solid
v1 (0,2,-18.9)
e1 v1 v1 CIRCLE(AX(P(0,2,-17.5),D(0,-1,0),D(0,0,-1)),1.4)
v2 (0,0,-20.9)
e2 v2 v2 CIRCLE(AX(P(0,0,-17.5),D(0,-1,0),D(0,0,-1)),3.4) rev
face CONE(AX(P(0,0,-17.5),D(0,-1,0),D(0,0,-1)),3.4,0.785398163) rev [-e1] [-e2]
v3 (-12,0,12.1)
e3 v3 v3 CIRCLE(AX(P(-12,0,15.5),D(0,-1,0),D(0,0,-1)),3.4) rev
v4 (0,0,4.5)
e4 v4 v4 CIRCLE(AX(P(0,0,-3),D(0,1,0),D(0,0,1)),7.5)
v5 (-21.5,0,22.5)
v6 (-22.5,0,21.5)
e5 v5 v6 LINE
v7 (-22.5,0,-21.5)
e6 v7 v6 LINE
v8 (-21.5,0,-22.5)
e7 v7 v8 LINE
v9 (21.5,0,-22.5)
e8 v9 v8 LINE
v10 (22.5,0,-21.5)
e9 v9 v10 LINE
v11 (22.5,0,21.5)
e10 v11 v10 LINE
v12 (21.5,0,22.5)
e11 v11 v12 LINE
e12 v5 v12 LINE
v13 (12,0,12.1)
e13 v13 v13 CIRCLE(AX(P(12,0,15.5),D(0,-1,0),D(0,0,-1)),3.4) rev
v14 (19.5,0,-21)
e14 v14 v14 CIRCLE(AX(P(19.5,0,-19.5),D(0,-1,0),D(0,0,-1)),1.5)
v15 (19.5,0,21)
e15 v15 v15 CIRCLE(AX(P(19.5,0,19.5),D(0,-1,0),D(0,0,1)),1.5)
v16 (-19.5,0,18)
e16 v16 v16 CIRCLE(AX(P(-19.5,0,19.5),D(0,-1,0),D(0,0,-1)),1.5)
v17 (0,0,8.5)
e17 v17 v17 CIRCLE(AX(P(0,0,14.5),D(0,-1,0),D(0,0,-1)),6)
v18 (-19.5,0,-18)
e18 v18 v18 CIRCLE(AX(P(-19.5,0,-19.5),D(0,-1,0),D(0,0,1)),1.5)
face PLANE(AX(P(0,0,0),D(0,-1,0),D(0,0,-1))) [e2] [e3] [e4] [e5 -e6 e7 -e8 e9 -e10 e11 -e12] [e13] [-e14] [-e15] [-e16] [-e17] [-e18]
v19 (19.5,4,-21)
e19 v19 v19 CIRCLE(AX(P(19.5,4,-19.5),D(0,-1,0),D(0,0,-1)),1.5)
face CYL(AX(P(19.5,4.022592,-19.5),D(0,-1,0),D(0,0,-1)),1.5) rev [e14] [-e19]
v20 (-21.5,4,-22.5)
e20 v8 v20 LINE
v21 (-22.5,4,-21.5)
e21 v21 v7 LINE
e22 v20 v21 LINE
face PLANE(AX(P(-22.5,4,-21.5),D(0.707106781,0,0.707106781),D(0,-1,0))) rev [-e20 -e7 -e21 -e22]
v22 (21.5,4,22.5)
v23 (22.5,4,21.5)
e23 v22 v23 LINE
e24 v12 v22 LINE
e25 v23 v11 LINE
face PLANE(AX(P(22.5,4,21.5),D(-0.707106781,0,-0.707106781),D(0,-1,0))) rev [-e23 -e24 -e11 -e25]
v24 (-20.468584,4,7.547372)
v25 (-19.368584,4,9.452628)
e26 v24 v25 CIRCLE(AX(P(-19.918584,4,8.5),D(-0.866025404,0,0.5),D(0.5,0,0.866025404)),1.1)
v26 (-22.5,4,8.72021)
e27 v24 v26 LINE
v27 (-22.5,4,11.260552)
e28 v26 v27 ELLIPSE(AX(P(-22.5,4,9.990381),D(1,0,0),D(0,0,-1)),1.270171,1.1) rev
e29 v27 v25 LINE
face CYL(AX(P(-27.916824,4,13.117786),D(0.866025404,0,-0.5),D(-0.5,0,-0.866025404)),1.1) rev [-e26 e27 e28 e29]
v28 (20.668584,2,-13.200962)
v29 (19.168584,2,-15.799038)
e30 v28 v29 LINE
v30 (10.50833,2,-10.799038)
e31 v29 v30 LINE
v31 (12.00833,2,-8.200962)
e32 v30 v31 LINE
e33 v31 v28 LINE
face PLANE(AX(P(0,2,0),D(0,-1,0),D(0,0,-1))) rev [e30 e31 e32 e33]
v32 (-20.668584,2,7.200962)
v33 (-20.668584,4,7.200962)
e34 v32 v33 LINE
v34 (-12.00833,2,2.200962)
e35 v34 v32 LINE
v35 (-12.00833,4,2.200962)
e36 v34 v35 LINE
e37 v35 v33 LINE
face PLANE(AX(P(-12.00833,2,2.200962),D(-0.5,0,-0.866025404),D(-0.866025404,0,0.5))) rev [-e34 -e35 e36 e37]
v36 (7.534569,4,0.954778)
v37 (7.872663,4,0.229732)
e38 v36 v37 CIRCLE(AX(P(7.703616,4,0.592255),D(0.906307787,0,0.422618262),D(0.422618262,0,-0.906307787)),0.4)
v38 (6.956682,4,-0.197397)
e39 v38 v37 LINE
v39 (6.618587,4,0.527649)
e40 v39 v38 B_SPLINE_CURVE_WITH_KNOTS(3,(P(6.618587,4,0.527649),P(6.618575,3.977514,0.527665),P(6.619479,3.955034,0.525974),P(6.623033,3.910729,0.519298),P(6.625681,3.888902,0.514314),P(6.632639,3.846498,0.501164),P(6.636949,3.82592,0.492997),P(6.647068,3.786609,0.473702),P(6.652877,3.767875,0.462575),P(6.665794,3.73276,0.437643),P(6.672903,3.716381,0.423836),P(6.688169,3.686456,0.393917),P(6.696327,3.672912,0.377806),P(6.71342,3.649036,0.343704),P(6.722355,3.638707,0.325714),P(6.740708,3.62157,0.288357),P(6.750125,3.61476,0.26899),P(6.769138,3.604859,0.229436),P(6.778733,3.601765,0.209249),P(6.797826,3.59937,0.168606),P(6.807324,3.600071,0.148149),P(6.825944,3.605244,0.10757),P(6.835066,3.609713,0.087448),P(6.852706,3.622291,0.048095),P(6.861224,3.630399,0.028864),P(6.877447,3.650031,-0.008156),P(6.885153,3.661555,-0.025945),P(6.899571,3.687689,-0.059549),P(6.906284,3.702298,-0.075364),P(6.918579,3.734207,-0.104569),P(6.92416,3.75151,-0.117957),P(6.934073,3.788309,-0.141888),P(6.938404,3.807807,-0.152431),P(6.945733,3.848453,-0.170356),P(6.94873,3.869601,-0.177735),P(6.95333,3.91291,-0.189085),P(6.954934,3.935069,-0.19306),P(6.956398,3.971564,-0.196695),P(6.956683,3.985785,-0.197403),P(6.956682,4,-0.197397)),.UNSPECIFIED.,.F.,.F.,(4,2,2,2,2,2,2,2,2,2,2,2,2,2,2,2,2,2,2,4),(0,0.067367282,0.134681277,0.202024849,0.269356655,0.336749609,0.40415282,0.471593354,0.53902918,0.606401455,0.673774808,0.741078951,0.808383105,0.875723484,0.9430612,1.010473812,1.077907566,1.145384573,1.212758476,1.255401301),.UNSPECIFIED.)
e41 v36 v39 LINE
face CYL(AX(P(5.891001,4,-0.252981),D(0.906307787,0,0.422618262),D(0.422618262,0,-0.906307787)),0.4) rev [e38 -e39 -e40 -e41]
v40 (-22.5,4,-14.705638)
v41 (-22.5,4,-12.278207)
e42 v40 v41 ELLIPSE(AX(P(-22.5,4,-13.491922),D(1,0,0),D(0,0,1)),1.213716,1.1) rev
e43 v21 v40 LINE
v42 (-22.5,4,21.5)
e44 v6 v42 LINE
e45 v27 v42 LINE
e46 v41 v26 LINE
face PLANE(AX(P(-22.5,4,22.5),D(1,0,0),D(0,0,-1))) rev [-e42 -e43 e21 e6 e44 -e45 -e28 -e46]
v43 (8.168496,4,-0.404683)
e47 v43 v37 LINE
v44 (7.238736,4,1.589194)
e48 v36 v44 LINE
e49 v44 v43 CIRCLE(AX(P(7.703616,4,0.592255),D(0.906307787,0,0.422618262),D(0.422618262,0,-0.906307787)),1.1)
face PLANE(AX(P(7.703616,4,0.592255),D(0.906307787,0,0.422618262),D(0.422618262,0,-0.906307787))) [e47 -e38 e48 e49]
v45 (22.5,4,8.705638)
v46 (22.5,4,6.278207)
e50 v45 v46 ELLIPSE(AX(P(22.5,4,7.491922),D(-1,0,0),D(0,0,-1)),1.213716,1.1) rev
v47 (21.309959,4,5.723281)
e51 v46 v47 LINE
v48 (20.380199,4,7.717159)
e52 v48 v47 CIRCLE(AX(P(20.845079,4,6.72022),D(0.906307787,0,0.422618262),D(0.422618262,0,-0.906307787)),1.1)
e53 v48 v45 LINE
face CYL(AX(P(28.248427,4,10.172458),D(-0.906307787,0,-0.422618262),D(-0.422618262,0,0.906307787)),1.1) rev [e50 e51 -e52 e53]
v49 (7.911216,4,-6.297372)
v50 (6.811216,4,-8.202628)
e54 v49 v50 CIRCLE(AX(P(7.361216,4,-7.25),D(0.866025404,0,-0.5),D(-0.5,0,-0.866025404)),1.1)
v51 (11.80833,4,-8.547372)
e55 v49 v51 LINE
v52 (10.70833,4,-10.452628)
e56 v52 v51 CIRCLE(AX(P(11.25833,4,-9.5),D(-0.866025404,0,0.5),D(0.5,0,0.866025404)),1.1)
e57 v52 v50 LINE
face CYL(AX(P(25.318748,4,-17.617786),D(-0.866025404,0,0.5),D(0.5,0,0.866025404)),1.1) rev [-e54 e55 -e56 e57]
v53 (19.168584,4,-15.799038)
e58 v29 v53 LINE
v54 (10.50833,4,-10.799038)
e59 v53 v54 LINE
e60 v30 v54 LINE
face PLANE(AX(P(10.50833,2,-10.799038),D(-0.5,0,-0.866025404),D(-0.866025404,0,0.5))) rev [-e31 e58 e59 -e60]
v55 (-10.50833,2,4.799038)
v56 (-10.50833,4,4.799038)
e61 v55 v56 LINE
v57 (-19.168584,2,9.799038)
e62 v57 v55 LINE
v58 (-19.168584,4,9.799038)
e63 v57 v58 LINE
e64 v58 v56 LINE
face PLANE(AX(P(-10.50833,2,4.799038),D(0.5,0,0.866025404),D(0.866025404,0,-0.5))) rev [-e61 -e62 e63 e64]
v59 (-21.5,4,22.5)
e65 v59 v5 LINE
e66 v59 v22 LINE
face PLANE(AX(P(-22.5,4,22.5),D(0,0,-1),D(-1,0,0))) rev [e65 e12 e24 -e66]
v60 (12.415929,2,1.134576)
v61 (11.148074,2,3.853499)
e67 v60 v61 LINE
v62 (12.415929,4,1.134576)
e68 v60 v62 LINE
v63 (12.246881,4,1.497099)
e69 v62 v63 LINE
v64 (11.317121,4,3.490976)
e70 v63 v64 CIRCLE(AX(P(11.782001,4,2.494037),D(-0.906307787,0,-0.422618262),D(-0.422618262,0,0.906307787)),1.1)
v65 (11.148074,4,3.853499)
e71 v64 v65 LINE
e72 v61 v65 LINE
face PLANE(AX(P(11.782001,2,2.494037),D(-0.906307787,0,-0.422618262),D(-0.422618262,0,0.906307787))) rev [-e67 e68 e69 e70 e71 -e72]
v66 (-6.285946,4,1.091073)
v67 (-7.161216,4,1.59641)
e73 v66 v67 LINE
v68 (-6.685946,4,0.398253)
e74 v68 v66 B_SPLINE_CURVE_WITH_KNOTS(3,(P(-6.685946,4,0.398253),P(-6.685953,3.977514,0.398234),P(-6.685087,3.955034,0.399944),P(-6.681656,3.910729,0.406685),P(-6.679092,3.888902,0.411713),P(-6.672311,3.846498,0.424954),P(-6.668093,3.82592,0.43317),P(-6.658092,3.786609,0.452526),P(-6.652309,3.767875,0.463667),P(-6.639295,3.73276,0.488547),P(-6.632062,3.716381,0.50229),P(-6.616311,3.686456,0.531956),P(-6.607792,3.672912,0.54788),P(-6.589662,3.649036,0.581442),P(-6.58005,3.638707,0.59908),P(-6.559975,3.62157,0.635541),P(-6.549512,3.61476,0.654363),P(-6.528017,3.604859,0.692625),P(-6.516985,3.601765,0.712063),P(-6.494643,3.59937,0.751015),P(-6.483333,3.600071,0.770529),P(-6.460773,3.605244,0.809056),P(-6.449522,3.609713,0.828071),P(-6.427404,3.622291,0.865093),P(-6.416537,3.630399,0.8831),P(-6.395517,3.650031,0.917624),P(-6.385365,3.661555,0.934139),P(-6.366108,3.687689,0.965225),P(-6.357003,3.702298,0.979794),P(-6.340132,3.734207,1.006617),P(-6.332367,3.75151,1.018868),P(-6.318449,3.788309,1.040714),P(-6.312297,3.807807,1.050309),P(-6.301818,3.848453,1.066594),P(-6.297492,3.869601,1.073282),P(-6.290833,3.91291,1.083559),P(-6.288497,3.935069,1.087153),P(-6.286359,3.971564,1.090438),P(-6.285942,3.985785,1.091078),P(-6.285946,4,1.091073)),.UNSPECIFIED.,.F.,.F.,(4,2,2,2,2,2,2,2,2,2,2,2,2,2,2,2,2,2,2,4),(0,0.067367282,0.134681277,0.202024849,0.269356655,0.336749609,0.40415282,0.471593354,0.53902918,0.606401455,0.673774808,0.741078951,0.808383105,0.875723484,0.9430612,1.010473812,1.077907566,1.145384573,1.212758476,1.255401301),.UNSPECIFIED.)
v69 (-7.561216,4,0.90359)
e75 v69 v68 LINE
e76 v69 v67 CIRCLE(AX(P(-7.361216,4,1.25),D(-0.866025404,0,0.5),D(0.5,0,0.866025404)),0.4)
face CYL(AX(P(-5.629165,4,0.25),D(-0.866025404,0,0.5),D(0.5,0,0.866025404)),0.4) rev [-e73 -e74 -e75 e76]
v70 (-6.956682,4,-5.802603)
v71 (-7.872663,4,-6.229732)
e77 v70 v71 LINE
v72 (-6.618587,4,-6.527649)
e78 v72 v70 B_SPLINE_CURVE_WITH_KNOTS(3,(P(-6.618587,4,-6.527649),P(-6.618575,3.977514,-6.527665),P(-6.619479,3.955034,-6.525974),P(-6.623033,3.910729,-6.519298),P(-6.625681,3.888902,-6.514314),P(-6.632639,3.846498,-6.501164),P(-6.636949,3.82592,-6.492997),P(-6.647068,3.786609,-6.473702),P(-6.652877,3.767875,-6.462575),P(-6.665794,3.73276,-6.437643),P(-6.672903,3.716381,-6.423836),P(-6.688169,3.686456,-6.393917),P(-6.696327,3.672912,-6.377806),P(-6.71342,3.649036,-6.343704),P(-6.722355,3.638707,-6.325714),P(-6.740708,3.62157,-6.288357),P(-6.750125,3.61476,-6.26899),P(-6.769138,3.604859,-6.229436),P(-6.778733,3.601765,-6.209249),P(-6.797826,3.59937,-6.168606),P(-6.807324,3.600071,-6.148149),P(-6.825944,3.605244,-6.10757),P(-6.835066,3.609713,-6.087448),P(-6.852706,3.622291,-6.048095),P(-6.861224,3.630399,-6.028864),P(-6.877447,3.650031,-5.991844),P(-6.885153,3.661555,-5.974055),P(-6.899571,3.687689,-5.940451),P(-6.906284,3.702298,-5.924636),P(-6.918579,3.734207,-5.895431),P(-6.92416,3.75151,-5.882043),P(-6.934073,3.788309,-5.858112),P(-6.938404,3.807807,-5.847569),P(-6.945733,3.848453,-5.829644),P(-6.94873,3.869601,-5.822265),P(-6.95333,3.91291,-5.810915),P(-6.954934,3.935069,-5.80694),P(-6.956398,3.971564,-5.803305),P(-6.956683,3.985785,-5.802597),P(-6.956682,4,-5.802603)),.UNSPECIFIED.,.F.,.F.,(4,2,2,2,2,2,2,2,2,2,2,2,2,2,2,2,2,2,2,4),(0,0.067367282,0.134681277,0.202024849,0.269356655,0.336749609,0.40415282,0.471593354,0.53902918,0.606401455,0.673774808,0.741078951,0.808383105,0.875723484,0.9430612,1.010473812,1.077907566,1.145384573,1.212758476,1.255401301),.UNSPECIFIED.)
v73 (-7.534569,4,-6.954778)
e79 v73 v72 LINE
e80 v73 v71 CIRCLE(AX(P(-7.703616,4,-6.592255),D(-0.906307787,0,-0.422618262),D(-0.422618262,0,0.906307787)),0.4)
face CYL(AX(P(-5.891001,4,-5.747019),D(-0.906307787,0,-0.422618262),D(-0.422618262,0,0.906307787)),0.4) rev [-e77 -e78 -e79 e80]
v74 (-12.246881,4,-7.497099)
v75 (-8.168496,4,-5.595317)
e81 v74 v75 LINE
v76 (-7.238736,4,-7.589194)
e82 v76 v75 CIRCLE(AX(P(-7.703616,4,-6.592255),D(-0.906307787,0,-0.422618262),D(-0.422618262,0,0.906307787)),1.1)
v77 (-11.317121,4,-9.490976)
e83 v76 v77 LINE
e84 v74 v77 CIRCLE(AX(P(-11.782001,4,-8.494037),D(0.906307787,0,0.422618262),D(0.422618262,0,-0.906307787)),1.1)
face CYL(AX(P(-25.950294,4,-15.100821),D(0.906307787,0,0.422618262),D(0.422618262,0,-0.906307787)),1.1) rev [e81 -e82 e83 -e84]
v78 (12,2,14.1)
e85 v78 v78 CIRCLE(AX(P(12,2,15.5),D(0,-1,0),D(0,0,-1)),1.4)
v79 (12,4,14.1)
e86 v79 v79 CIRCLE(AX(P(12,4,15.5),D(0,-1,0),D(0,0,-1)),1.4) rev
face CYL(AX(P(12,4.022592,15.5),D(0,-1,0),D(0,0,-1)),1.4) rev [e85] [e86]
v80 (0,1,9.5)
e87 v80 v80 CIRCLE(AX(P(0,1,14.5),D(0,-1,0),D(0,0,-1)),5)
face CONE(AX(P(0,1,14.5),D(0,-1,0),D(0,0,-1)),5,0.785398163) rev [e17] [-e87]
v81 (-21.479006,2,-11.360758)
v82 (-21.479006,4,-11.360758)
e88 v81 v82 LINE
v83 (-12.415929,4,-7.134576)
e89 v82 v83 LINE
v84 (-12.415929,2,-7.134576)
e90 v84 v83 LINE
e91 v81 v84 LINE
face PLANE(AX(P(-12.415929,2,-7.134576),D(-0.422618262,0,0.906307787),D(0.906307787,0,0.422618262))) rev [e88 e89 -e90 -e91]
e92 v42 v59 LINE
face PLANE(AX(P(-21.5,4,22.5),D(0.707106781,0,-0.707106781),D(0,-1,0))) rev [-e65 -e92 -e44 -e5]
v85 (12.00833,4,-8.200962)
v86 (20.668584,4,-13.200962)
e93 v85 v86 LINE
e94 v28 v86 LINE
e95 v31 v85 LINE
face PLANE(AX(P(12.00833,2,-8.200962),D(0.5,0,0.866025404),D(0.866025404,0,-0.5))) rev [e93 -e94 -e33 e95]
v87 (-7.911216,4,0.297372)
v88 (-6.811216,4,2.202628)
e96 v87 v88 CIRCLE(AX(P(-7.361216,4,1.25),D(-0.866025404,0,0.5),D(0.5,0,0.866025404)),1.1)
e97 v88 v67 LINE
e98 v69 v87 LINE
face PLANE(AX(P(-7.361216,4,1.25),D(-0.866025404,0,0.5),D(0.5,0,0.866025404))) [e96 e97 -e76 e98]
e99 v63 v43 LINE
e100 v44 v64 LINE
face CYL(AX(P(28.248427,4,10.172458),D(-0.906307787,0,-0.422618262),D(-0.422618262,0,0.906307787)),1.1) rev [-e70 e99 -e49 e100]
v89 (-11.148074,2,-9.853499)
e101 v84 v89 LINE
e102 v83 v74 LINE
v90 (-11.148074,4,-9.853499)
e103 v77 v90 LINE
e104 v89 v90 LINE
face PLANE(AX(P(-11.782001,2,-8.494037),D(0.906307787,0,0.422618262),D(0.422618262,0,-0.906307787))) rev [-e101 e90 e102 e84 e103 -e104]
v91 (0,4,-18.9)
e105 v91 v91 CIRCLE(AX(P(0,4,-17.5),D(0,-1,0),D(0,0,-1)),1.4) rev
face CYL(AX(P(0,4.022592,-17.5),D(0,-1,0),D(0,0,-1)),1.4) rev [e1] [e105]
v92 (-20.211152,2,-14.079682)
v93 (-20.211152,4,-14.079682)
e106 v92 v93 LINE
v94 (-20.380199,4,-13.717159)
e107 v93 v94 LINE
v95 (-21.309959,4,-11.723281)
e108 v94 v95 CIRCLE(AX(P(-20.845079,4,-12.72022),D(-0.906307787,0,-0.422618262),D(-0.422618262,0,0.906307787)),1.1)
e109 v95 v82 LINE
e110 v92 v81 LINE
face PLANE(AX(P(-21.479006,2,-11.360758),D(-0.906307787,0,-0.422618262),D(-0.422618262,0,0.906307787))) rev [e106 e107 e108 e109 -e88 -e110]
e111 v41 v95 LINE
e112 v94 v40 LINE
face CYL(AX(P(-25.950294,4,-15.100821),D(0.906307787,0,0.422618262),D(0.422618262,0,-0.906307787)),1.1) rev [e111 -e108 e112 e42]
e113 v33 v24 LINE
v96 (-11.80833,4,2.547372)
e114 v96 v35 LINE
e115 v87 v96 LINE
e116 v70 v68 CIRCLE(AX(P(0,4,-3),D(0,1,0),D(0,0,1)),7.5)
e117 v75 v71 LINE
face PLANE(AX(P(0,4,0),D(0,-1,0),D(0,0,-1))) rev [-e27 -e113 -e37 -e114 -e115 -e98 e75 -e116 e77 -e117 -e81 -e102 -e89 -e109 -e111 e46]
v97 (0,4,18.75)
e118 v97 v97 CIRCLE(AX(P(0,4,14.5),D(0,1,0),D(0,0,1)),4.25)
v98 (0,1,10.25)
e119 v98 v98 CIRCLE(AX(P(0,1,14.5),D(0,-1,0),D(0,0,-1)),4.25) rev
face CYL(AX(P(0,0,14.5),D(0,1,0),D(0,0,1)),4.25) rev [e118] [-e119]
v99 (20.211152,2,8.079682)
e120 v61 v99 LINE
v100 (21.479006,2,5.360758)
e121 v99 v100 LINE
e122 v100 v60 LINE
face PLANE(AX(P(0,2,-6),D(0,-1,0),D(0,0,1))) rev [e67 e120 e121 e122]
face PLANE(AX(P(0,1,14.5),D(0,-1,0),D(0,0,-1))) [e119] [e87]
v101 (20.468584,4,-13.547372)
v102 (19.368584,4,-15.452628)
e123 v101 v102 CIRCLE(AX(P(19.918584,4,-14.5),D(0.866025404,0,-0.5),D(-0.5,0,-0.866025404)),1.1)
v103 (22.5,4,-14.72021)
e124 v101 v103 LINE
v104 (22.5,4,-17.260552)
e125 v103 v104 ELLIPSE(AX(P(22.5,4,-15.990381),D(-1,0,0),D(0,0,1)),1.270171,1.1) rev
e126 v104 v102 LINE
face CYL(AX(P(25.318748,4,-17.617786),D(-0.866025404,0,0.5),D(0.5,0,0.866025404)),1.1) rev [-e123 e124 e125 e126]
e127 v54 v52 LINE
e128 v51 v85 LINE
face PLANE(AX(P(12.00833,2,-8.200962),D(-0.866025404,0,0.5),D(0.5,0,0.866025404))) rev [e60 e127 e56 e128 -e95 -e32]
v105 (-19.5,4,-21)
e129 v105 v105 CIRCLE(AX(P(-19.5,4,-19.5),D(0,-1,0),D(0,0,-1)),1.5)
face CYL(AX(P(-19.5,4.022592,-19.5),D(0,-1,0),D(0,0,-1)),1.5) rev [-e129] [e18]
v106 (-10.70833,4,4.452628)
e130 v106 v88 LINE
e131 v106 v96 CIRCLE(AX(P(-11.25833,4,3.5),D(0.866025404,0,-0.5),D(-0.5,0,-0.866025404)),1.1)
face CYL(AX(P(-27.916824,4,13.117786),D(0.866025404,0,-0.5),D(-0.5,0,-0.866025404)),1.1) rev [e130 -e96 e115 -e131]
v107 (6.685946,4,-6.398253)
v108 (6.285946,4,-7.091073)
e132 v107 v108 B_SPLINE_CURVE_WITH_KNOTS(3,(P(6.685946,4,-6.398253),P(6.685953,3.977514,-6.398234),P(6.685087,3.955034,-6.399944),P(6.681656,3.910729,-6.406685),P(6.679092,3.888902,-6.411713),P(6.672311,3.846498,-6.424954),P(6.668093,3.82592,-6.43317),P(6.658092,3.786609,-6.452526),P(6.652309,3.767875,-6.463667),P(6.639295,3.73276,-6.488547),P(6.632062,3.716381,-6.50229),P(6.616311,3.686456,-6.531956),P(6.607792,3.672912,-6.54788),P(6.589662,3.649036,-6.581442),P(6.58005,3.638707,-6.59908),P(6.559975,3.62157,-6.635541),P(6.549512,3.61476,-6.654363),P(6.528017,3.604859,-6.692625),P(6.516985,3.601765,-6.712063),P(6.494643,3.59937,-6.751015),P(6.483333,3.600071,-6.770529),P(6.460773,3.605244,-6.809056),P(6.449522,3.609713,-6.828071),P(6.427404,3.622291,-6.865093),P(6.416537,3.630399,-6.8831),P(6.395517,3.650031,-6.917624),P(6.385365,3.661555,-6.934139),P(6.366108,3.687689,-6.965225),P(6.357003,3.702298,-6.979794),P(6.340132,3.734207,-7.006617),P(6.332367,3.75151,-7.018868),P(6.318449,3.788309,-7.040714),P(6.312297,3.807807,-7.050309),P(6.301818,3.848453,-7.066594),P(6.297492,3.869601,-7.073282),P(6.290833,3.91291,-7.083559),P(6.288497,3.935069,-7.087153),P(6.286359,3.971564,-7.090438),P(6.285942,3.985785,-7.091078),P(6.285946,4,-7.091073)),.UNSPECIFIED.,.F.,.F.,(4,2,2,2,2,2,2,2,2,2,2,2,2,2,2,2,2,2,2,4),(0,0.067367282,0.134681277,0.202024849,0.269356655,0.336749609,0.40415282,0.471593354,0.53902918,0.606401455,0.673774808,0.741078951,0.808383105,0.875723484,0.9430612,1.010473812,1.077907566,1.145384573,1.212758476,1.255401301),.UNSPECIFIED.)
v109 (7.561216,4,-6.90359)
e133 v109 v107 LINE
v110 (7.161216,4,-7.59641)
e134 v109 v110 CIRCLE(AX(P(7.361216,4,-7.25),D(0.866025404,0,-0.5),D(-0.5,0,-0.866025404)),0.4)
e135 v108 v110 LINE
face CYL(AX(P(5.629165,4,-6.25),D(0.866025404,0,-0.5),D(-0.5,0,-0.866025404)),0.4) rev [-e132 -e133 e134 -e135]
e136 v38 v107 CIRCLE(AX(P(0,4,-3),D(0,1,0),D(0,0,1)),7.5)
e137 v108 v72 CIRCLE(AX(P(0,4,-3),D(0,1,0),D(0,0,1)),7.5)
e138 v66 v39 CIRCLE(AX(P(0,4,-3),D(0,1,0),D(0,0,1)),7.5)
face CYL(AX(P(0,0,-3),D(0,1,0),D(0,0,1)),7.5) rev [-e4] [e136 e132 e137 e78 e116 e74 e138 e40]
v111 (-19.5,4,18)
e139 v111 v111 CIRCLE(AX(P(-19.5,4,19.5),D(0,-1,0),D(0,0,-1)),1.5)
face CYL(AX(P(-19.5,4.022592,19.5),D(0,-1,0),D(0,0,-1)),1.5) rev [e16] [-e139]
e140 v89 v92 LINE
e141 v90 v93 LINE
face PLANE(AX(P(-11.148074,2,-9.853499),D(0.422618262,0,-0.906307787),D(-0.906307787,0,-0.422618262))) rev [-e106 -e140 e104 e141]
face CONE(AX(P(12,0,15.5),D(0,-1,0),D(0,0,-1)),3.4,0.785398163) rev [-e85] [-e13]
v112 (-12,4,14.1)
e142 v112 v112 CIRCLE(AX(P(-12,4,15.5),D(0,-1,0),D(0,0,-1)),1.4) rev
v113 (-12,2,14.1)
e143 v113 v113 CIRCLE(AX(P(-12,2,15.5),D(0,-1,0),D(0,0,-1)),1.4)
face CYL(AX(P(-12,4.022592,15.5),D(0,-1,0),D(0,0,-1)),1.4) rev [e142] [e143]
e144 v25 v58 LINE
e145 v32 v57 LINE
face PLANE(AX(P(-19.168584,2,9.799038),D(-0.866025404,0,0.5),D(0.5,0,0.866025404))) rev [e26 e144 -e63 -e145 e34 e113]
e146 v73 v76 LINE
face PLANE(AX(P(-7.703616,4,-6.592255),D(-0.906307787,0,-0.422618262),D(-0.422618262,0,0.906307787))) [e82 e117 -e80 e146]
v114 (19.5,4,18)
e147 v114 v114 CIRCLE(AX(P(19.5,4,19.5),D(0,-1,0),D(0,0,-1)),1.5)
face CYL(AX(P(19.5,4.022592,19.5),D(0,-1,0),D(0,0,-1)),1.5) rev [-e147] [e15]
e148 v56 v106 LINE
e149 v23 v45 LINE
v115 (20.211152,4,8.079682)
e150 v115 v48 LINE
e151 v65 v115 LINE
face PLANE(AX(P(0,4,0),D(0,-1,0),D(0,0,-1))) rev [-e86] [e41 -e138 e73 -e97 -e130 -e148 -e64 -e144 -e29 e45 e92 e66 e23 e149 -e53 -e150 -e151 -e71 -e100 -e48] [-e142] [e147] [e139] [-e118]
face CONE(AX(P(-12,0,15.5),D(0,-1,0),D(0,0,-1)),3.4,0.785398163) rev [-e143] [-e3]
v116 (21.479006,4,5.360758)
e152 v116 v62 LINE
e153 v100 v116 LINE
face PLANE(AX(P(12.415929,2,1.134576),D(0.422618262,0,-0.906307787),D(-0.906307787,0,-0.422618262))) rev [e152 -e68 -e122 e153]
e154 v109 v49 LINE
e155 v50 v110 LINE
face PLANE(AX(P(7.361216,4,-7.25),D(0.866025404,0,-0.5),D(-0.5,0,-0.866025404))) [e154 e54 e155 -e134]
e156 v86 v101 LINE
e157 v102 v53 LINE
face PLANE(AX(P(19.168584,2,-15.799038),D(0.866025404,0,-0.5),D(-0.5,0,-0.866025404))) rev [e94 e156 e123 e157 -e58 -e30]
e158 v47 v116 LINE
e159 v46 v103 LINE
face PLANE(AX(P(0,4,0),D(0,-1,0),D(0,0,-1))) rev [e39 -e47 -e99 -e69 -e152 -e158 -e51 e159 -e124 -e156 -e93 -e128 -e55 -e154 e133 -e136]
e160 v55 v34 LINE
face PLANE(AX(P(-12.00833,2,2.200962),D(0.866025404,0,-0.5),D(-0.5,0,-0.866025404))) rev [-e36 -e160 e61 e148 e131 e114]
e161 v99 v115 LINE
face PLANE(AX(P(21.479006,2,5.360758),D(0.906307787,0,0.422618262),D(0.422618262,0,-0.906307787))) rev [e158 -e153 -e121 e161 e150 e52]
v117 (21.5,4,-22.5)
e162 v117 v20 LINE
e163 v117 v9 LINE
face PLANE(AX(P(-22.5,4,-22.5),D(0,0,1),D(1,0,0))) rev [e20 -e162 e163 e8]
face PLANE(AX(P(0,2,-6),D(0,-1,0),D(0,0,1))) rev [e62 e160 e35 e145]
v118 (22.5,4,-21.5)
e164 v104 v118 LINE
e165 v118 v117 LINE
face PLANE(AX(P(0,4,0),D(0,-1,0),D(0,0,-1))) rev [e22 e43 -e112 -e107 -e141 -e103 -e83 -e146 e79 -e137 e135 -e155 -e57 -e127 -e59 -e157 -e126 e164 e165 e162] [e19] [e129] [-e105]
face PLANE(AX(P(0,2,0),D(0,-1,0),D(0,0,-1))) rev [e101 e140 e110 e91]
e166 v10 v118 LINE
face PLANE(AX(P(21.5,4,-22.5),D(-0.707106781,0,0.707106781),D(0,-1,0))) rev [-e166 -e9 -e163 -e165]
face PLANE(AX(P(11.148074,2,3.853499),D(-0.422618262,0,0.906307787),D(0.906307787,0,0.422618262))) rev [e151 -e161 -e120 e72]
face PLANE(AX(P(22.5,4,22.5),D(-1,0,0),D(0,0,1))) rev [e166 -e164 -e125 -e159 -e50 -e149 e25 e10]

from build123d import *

# Parameters (mm, degrees)
SKETCH_1_W               = 45
SKETCH_1_H               = 45
EXTRUDE_1_DEPTH          = 4
SKETCH_2_R               = 7.5
CUT_EXTRUDE_1_DEPTH      = 33.070235422
CUT_EXTRUDE_START        = -4.5
SKETCH_4_R               = 1.1
CUT_EXTRUDE_3_DEPTH      = 51.888424881
SKETCH_10_R              = 0.4
CUT_EXTRUDE_9_DEPTH      = 2
SKETCH_7_R               = 1.1
CUT_EXTRUDE_5_DEPTH      = 52.18645266
SKETCH_11_R              = 0.4
CUT_EXTRUDE_10_DEPTH     = 2
CUT_EXTRUDE_4_DEPTH      = 2
PATTERN_CIRCULAR_1_COUNT = 2
SKETCH_6_R               = 1.5
CUT_EXTRUDE_6_DEPTH      = 33.070235434
SKETCH_8_R               = 4.25
CUT_EXTRUDE_7_DEPTH      = 33.070235434
SKETCH_9_R               = 6
CUT_EXTRUDE_8_DEPTH      = 1
SKETCH_12_R              = 1.4
CUT_EXTRUDE_11_DEPTH     = 33.070235434
CHAMFER_1_SIZE           = 1
CHAMFER_2_SIZE           = 1
CHAMFER_3_SIZE           = 2


with BuildPart() as part:
    # 草图1 → 凸台-拉伸1 (new body)
    with BuildSketch(Plane(origin=(0, 0, 0), x_dir=(1, 0, 0), z_dir=(0, 1, 0))):
        Rectangle(SKETCH_1_W, SKETCH_1_H)
    extrude(amount=EXTRUDE_1_DEPTH)

    # 草图2 → 切除-拉伸1 (cut, through all)
    with BuildSketch(Plane(origin=(0, 4, 0), x_dir=(1, 0, 0), z_dir=(0, 1, 0))):
        with Locations(Location((0, 3, 0), (0, 0, 270))):
            Circle(SKETCH_2_R)
    extrude(amount=-CUT_EXTRUDE_1_DEPTH, mode=Mode.SUBTRACT)

    # 草图4 → 切除-拉伸3 (cut)
    with BuildSketch(Plane(origin=(-11.782001231, 4, -8.494037403), x_dir=(-0.4226182617407036, 0, 0.9063077870366482), z_dir=(-0.9063077870366482, 0, -0.4226182617407036)).offset(CUT_EXTRUDE_START)):
        Circle(SKETCH_4_R)
    cut_extrude_3 = extrude(amount=CUT_EXTRUDE_3_DEPTH, mode=Mode.SUBTRACT)

    # 草图10 → 切除-拉伸9 (cut)
    with BuildSketch(Plane(origin=(-8.852682854, 0, -4.12807381), x_dir=(-0.4226182617407035, 0, 0.906307787036648), z_dir=(-0.906307787036648, 0, -0.4226182617407035))):
        with Locations((-2.718923361, 4)):
            Circle(SKETCH_10_R)
    cut_extrude_9 = extrude(amount=-CUT_EXTRUDE_9_DEPTH, mode=Mode.SUBTRACT)

    # 草图7 → 切除-拉伸5 (cut)
    with BuildSketch(Plane(origin=(11.258330249, 4, -9.5), x_dir=(-0.5000000000000042, 0, -0.8660254037844363), z_dir=(0.8660254037844363, 0, -0.5000000000000042)).offset(CUT_EXTRUDE_START)):
        Circle(SKETCH_7_R)
    cut_extrude_5 = extrude(amount=CUT_EXTRUDE_5_DEPTH, mode=Mode.SUBTRACT)

    # 草图11 → 切除-拉伸10 (cut)
    with BuildSketch(Plane(origin=(8.660254038, 0, -5), x_dir=(-0.5000000000000042, 0, -0.8660254037844363), z_dir=(0.8660254037844363, 0, -0.5000000000000042))):
        with Locations((2.598076211, 4)):
            Circle(SKETCH_11_R)
    cut_extrude_10 = extrude(amount=-CUT_EXTRUDE_10_DEPTH, mode=Mode.SUBTRACT)

    # 草图5 → 切除-拉伸4 (cut)
    with BuildSketch(Plane(origin=(0, 4, 0), x_dir=(1, 0, 0), z_dir=(0, 1, 0))):
        Polygon((-11.782001231, 8.494037403), (-12.246881319, 7.497098837), (-12.415928624, 7.134575722), (-21.479006494, 11.360758339), (-20.211151709, 14.079681701), (-11.148073839, 9.853499083), (-11.317121144, 9.490975968), align=None)
        Polygon((12.008330249, 8.200961894), (10.508330249, 10.799038106), (19.168584287, 15.799038106), (20.668584287, 13.200961894), align=None)
    cut_extrude_4 = extrude(amount=-CUT_EXTRUDE_4_DEPTH, mode=Mode.SUBTRACT)

    # 阵列(圆周)1: 切除-拉伸3, 切除-拉伸9, 切除-拉伸5, 切除-拉伸10, 切除-拉伸4 ×2 about axis
    pattern_circular_1_axis = Axis((0, 0, -3), (0, 1, 0))
    add([cut_extrude_3.rotate(pattern_circular_1_axis, i * 360 / PATTERN_CIRCULAR_1_COUNT) for i in range(1, PATTERN_CIRCULAR_1_COUNT)], mode=Mode.SUBTRACT)
    add([cut_extrude_9.rotate(pattern_circular_1_axis, i * 360 / PATTERN_CIRCULAR_1_COUNT) for i in range(1, PATTERN_CIRCULAR_1_COUNT)], mode=Mode.SUBTRACT)
    add([cut_extrude_5.rotate(pattern_circular_1_axis, i * 360 / PATTERN_CIRCULAR_1_COUNT) for i in range(1, PATTERN_CIRCULAR_1_COUNT)], mode=Mode.SUBTRACT)
    add([cut_extrude_10.rotate(pattern_circular_1_axis, i * 360 / PATTERN_CIRCULAR_1_COUNT) for i in range(1, PATTERN_CIRCULAR_1_COUNT)], mode=Mode.SUBTRACT)
    add([cut_extrude_4.rotate(pattern_circular_1_axis, i * 360 / PATTERN_CIRCULAR_1_COUNT) for i in range(1, PATTERN_CIRCULAR_1_COUNT)], mode=Mode.SUBTRACT)

    # 草图6 → 切除-拉伸6 (cut, through all)
    with BuildSketch(Plane.XZ):
        with Locations(Location((19.5, -19.5, 0), (0, 0, 270))):
            Circle(SKETCH_6_R)
        with Locations(Location((-19.5, -19.5, 0), (0, 0, 270))):
            Circle(SKETCH_6_R)
        with Locations(Location((-19.5, 19.5, 0), (0, 0, 270))):
            Circle(SKETCH_6_R)
        with Locations(Location((19.5, 19.5, 0), (0, 0, 270))):
            Circle(SKETCH_6_R)
    extrude(amount=-CUT_EXTRUDE_6_DEPTH, mode=Mode.SUBTRACT)

    # 草图8 → 切除-拉伸7 (cut, through all)
    with BuildSketch(Plane(origin=(0, 4, 0), x_dir=(1, 0, 0), z_dir=(0, 1, 0))):
        with Locations(Location((0, -14.5, 0), (0, 0, 270))):
            Circle(SKETCH_8_R)
    extrude(amount=-CUT_EXTRUDE_7_DEPTH, mode=Mode.SUBTRACT)

    # 草图9 → 切除-拉伸8 (cut)
    with BuildSketch(Plane.XZ):
        with Locations(Location((0, 14.5, 0), (0, 0, 270))):
            Circle(SKETCH_9_R)
    extrude(amount=-CUT_EXTRUDE_8_DEPTH, mode=Mode.SUBTRACT)

    # 草图12 → 切除-拉伸11 (cut, through all)
    with BuildSketch(Plane(origin=(0, 0, 0), x_dir=(1, 0, 0), z_dir=(0, 1, 0))):
        with Locations(Location((0, 17.5, 0), (0, 0, 90))):
            Circle(SKETCH_12_R)
        with Locations(Location((-12, -15.5, 0), (0, 0, 90))):
            Circle(SKETCH_12_R)
        with Locations(Location((12, -15.5, 0), (0, 0, 90))):
            Circle(SKETCH_12_R)
    extrude(amount=CUT_EXTRUDE_11_DEPTH, mode=Mode.SUBTRACT)

    # 倒角1
    chamfer_1_edges = [part.edges().sort_by_distance(p)[0] for p in [
        (0, 1, 20.5),
    ]]
    chamfer(chamfer_1_edges, length=CHAMFER_1_SIZE - 0.0001)  # a hair under: the kernel refuses the full size

    # 倒角2
    chamfer_2_edges = [part.edges().sort_by_distance(p)[0] for p in [
        (22.5, 2, 22.5),
        (-22.5, 2, 22.5),
        (-22.5, 2, -22.5),
        (22.5, 2, -22.5),
    ]]
    chamfer(chamfer_2_edges, length=CHAMFER_2_SIZE)

    # 倒角3
    chamfer_3_edges = [part.edges().sort_by_distance(p)[0] for p in [
        (0, 0, -16.1),
        (-12, 0, 16.9),
        (12, 0, 16.9),
    ]]
    chamfer(chamfer_3_edges, length=CHAMFER_3_SIZE)


solid = part.part
